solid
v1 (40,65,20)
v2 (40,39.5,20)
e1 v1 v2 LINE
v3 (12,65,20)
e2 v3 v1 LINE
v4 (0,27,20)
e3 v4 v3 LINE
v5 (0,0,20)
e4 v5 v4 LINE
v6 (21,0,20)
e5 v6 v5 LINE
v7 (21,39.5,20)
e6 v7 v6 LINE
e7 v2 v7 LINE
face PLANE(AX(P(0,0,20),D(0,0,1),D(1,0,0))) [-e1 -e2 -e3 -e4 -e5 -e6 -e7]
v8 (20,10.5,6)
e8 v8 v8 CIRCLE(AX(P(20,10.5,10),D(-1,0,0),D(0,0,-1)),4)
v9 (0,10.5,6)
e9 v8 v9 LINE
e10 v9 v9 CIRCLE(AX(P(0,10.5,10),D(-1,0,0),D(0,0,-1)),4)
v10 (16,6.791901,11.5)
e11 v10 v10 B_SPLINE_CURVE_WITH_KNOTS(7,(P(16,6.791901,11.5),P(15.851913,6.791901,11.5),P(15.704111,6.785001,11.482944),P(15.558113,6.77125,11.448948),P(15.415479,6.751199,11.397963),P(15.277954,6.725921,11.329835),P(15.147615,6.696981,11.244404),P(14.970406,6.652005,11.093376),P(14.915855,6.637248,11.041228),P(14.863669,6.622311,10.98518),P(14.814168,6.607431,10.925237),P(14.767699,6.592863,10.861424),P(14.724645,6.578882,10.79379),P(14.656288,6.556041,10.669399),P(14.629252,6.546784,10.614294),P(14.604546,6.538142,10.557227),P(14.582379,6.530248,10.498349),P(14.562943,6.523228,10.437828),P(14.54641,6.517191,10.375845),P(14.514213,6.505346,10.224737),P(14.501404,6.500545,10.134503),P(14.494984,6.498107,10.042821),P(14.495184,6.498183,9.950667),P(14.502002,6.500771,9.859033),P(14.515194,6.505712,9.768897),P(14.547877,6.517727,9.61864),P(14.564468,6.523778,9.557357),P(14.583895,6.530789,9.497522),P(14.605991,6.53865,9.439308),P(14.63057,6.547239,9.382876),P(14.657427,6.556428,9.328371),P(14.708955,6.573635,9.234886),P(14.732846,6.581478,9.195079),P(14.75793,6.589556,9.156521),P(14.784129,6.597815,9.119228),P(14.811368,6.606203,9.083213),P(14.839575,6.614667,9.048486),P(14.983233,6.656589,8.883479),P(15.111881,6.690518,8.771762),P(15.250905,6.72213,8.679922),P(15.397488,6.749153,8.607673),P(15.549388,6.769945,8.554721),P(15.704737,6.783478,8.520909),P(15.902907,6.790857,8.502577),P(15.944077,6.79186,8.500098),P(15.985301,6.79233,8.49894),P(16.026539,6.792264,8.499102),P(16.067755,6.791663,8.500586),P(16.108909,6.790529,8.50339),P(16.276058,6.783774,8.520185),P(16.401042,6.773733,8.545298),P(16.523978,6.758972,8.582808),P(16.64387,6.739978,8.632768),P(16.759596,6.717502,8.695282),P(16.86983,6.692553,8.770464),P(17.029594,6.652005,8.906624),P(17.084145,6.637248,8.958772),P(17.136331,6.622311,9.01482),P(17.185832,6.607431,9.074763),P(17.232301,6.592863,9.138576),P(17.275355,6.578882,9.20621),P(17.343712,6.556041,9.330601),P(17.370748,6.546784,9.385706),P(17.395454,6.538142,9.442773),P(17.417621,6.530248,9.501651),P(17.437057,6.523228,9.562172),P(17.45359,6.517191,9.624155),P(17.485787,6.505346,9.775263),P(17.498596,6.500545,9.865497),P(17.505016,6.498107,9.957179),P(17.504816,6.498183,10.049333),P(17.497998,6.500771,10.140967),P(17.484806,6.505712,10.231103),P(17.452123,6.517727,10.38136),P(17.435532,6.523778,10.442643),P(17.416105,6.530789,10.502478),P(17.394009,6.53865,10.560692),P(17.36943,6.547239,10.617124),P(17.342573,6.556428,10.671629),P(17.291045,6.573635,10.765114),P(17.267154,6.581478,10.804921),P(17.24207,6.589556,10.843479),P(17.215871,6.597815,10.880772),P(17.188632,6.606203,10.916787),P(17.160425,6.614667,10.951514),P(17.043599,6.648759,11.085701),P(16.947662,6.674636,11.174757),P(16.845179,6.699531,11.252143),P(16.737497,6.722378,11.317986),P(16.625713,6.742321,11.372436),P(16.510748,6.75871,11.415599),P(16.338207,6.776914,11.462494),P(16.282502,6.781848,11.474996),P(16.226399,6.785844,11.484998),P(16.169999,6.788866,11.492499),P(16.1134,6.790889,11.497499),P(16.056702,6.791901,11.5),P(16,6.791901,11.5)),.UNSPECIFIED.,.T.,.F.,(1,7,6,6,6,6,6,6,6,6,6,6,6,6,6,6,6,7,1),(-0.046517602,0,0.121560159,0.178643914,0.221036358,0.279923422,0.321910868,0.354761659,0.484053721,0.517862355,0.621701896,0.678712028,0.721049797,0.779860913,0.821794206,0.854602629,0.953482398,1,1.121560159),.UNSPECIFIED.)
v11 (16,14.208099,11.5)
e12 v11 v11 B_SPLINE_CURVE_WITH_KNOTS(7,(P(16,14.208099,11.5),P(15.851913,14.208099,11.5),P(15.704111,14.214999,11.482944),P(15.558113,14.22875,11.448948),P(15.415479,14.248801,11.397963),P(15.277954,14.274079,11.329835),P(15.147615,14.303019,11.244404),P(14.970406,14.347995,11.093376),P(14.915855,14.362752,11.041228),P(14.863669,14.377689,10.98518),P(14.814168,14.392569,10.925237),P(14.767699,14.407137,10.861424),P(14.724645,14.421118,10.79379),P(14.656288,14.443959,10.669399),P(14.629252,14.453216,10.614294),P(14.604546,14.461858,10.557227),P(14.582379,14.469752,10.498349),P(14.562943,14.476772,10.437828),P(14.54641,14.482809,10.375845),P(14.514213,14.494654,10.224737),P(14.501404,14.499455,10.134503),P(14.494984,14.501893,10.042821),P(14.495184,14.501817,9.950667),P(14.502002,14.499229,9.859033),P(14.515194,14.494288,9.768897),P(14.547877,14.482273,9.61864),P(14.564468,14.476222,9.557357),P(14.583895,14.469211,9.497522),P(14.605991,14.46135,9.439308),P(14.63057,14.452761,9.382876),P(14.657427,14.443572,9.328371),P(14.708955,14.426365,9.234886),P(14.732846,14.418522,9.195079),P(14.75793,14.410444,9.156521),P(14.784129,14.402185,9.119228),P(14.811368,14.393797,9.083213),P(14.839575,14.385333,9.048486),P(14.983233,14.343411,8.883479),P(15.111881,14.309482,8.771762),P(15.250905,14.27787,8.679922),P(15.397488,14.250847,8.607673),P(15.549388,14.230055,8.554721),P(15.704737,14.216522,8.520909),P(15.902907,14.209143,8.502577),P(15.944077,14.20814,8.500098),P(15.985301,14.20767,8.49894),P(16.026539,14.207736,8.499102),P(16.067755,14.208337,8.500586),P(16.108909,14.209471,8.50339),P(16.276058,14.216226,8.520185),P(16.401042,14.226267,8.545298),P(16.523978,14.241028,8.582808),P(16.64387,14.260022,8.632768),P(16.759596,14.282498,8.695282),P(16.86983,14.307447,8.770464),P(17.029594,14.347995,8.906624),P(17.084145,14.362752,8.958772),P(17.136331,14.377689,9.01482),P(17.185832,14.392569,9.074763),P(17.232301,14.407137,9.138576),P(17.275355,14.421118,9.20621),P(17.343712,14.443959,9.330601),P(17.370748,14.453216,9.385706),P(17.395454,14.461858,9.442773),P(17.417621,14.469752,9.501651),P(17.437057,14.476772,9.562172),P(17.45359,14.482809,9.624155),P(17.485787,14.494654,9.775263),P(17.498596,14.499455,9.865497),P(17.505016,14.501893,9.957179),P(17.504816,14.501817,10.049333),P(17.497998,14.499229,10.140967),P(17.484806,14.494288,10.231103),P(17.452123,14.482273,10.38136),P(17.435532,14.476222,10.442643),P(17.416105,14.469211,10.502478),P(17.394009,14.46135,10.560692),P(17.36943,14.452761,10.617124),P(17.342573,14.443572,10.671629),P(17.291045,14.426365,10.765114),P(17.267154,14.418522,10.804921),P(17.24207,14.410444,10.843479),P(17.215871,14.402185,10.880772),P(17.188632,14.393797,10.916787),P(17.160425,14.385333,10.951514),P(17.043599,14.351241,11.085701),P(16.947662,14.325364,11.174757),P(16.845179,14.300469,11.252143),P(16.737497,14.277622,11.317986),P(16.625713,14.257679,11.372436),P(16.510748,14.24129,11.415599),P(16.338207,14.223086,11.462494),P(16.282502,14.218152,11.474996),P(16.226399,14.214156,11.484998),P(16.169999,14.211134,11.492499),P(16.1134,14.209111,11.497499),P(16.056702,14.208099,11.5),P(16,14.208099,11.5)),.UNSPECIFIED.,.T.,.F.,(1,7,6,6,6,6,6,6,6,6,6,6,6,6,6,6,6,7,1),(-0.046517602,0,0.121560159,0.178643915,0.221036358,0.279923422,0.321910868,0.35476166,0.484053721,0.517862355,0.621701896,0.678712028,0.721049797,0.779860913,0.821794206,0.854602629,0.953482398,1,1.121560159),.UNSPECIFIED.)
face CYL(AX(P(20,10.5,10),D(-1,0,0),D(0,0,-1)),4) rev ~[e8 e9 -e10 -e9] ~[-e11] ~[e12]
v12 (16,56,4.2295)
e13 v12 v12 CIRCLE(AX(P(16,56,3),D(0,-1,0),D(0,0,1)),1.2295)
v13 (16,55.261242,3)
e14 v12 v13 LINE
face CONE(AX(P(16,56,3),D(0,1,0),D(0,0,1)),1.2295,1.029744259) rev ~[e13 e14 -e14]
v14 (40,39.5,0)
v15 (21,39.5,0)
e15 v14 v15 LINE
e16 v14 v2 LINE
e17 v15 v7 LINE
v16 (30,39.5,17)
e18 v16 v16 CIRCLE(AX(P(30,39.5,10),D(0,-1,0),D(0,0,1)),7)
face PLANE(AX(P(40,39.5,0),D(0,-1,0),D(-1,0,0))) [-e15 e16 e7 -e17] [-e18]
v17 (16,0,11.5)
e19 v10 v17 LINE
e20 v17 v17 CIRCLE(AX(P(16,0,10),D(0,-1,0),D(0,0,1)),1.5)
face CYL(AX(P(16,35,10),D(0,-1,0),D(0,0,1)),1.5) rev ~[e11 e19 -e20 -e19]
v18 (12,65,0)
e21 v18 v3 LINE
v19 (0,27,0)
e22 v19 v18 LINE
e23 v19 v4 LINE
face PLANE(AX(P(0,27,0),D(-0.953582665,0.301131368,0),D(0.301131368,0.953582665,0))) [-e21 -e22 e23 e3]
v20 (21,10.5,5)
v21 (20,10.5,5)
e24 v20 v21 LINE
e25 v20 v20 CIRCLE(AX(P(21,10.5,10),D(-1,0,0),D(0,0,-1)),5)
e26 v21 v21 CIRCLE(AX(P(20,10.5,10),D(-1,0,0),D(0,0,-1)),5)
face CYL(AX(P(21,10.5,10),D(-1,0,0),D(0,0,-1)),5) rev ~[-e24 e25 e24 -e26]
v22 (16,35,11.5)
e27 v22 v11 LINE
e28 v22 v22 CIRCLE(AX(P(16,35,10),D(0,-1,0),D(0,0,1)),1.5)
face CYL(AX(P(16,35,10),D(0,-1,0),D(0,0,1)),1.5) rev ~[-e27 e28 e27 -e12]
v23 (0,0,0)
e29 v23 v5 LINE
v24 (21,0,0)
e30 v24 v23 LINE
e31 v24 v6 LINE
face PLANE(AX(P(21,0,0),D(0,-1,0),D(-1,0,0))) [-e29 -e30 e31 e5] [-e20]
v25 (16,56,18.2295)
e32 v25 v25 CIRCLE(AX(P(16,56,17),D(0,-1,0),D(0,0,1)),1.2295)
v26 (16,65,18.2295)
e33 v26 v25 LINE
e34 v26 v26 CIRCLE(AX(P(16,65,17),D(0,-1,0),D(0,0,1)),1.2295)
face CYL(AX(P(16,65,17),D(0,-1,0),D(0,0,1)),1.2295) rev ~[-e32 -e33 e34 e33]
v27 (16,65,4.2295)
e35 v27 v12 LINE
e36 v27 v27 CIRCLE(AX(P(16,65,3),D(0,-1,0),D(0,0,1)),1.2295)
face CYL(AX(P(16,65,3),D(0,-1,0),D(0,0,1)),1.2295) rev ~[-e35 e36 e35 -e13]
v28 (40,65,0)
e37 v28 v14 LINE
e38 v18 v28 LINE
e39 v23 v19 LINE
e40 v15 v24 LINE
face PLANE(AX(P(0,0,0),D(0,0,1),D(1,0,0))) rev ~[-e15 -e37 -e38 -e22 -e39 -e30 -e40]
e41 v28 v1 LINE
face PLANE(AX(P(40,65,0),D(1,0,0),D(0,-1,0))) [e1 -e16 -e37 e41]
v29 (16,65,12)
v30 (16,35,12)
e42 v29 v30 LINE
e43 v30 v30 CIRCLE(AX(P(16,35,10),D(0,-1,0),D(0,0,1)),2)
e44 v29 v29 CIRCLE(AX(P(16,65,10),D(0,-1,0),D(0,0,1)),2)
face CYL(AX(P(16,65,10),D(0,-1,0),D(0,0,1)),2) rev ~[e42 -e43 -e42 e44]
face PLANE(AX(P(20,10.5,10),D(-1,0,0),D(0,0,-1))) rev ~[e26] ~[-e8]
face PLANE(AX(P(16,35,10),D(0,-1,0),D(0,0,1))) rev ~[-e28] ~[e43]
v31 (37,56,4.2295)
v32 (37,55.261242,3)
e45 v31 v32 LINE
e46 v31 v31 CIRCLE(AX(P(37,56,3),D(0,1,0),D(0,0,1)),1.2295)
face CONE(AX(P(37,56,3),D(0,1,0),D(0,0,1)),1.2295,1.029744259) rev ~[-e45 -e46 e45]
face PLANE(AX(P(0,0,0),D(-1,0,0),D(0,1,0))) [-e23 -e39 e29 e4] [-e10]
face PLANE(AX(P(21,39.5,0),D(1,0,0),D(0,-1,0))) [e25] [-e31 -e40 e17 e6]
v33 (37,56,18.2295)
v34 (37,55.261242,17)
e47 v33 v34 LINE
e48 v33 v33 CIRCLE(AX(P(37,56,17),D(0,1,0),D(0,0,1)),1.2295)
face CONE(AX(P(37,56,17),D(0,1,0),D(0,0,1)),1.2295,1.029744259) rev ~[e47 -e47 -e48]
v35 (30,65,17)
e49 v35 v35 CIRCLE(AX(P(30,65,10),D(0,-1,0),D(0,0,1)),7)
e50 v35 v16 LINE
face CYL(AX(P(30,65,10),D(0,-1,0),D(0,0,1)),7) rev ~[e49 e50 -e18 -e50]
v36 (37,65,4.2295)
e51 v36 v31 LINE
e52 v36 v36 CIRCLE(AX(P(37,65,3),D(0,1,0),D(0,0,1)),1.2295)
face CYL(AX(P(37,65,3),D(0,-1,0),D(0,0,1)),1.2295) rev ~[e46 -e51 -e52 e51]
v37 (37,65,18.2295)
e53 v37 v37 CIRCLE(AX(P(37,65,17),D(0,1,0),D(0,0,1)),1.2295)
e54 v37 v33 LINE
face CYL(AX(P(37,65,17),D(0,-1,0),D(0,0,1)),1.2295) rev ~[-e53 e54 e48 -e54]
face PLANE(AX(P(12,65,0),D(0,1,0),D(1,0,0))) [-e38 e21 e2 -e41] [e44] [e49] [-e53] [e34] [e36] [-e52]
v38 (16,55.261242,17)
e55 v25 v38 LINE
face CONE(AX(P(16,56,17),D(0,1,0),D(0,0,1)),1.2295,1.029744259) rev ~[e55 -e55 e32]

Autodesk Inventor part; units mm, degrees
ref_plane "XY Plane" through (0, 0, 0) normal (0, 0, 1) x (1, 0, 0)
sketch "Skizze1" plane through (0, 0, 0) normal (0, 0, 1) x (1, 0, 0)
  line L0 (0, 0) -> (0, 27)
  line L1 (0, 27) -> (12, 65)
  line L2 (12, 65) -> (40, 65)
  line L3 (40, 65) -> (40, 39.5)
  line L4 (40, 39.5) -> (21, 39.5)
  line L5 (21, 39.5) -> (21, 0)
  line L6 (21, 0) -> (0, 0)
  dimension "d0" = 65
  dimension "d1" = 21
  dimension "d2" = 39.5
  dimension "d3" = 38
  dimension "d4" = 28
  dimension "d5" = 12
extrude "Extrusion1" add sketch "Skizze1" along normal blind 20
sketch "Skizze3" plane through (12, 65, 0) normal (0, 1, 0) x (1, 0, 0)
  line L0 (0, 0) -> (0, -20) projected
  line L1 (28, 0) -> (28, -20) projected
  point P0 (-12, 0)
  point P1 (18, -10)
  point P2 (28, -10)
  dimension "d16" = 10
hole "Bohrung2" at (30, 65, 10) direction (0, -1, 0) diameter 14 end through all
sketch "Skizze4" plane through (12, 65, 0) normal (0, 1, 0) x (1, 0, 0)
  line L0 (0, 0) -> (0, -20) projected
  line L1 (28, 0) -> (28, -20) projected
  point P0 (-12, 0)
  point P1 (4, -10)
  point P2 (28, -10)
  dimension "d24" = 4
hole "Bohrung3" at (16, 65, 10) direction (0, -1, 0) diameter 3 depth 65 counterbore diameter 4 counterbore depth 30
sketch "Skizze5" plane through (21, 0, 0) normal (1, 0, 0) x (0, 0, -1)
  line L0 (0, 0) -> (-20, 0) projected
  point P0 (-10, 10.5)
  point P1 (-10, 0)
  dimension "d32" = 10.5
hole "Bohrung4" at (21, 10.5, 10) direction (-1, 0, 0) diameter 8 depth 21 counterbore diameter 10 counterbore depth 1
ref_plane "Arbeitsebene1" through (0, 12, 0) normal (0, 1, 0) x (-1, 0, 0)
sketch "Skizze8" plane through (12, 65, 0) normal (0, 1, 0) x (1, 0, 0)
  circle A0 centre (4, -10) radius 2 projected
  circle A1 centre (18, -10) radius 7 projected
  line L0 (28, 0) -> (0, 0) projected
  line L1 (0, 0) -> (0, -20) projected
  line L2 (28, -20) -> (0, -20) projected
  line L3 (28, 0) -> (28, -20) projected
  line L4 (4, -10) -> (4, -3) construction
  line L5 (4, -10) -> (4, -17) construction
  line L6 (18, -10) -> (9, -10) construction
  line L7 (9, 0) -> (9, -20) projected
  point P0 (-12, 0)
  dimension "d57" = 14
hole "Bohrung7" at (16, 65, 17) at (16, 65, 3) direction (0, -1, 0) diameter 2.459 depth 9 tip angle 118 thread size "M3x0.5" class "6H" standard "ISO Metric profile"
ref_plane "Arbeitsebene2" through (26.5, 0, 0) normal (1, 0, 0) x (0, 1, 0)
mirror "Spiegeln2" about plane through (26.5, 0, 0) normal (1, 0, 0) of "Bohrung7"
properties part number "MotorBlock" material "Stahl, galvanisiert"
